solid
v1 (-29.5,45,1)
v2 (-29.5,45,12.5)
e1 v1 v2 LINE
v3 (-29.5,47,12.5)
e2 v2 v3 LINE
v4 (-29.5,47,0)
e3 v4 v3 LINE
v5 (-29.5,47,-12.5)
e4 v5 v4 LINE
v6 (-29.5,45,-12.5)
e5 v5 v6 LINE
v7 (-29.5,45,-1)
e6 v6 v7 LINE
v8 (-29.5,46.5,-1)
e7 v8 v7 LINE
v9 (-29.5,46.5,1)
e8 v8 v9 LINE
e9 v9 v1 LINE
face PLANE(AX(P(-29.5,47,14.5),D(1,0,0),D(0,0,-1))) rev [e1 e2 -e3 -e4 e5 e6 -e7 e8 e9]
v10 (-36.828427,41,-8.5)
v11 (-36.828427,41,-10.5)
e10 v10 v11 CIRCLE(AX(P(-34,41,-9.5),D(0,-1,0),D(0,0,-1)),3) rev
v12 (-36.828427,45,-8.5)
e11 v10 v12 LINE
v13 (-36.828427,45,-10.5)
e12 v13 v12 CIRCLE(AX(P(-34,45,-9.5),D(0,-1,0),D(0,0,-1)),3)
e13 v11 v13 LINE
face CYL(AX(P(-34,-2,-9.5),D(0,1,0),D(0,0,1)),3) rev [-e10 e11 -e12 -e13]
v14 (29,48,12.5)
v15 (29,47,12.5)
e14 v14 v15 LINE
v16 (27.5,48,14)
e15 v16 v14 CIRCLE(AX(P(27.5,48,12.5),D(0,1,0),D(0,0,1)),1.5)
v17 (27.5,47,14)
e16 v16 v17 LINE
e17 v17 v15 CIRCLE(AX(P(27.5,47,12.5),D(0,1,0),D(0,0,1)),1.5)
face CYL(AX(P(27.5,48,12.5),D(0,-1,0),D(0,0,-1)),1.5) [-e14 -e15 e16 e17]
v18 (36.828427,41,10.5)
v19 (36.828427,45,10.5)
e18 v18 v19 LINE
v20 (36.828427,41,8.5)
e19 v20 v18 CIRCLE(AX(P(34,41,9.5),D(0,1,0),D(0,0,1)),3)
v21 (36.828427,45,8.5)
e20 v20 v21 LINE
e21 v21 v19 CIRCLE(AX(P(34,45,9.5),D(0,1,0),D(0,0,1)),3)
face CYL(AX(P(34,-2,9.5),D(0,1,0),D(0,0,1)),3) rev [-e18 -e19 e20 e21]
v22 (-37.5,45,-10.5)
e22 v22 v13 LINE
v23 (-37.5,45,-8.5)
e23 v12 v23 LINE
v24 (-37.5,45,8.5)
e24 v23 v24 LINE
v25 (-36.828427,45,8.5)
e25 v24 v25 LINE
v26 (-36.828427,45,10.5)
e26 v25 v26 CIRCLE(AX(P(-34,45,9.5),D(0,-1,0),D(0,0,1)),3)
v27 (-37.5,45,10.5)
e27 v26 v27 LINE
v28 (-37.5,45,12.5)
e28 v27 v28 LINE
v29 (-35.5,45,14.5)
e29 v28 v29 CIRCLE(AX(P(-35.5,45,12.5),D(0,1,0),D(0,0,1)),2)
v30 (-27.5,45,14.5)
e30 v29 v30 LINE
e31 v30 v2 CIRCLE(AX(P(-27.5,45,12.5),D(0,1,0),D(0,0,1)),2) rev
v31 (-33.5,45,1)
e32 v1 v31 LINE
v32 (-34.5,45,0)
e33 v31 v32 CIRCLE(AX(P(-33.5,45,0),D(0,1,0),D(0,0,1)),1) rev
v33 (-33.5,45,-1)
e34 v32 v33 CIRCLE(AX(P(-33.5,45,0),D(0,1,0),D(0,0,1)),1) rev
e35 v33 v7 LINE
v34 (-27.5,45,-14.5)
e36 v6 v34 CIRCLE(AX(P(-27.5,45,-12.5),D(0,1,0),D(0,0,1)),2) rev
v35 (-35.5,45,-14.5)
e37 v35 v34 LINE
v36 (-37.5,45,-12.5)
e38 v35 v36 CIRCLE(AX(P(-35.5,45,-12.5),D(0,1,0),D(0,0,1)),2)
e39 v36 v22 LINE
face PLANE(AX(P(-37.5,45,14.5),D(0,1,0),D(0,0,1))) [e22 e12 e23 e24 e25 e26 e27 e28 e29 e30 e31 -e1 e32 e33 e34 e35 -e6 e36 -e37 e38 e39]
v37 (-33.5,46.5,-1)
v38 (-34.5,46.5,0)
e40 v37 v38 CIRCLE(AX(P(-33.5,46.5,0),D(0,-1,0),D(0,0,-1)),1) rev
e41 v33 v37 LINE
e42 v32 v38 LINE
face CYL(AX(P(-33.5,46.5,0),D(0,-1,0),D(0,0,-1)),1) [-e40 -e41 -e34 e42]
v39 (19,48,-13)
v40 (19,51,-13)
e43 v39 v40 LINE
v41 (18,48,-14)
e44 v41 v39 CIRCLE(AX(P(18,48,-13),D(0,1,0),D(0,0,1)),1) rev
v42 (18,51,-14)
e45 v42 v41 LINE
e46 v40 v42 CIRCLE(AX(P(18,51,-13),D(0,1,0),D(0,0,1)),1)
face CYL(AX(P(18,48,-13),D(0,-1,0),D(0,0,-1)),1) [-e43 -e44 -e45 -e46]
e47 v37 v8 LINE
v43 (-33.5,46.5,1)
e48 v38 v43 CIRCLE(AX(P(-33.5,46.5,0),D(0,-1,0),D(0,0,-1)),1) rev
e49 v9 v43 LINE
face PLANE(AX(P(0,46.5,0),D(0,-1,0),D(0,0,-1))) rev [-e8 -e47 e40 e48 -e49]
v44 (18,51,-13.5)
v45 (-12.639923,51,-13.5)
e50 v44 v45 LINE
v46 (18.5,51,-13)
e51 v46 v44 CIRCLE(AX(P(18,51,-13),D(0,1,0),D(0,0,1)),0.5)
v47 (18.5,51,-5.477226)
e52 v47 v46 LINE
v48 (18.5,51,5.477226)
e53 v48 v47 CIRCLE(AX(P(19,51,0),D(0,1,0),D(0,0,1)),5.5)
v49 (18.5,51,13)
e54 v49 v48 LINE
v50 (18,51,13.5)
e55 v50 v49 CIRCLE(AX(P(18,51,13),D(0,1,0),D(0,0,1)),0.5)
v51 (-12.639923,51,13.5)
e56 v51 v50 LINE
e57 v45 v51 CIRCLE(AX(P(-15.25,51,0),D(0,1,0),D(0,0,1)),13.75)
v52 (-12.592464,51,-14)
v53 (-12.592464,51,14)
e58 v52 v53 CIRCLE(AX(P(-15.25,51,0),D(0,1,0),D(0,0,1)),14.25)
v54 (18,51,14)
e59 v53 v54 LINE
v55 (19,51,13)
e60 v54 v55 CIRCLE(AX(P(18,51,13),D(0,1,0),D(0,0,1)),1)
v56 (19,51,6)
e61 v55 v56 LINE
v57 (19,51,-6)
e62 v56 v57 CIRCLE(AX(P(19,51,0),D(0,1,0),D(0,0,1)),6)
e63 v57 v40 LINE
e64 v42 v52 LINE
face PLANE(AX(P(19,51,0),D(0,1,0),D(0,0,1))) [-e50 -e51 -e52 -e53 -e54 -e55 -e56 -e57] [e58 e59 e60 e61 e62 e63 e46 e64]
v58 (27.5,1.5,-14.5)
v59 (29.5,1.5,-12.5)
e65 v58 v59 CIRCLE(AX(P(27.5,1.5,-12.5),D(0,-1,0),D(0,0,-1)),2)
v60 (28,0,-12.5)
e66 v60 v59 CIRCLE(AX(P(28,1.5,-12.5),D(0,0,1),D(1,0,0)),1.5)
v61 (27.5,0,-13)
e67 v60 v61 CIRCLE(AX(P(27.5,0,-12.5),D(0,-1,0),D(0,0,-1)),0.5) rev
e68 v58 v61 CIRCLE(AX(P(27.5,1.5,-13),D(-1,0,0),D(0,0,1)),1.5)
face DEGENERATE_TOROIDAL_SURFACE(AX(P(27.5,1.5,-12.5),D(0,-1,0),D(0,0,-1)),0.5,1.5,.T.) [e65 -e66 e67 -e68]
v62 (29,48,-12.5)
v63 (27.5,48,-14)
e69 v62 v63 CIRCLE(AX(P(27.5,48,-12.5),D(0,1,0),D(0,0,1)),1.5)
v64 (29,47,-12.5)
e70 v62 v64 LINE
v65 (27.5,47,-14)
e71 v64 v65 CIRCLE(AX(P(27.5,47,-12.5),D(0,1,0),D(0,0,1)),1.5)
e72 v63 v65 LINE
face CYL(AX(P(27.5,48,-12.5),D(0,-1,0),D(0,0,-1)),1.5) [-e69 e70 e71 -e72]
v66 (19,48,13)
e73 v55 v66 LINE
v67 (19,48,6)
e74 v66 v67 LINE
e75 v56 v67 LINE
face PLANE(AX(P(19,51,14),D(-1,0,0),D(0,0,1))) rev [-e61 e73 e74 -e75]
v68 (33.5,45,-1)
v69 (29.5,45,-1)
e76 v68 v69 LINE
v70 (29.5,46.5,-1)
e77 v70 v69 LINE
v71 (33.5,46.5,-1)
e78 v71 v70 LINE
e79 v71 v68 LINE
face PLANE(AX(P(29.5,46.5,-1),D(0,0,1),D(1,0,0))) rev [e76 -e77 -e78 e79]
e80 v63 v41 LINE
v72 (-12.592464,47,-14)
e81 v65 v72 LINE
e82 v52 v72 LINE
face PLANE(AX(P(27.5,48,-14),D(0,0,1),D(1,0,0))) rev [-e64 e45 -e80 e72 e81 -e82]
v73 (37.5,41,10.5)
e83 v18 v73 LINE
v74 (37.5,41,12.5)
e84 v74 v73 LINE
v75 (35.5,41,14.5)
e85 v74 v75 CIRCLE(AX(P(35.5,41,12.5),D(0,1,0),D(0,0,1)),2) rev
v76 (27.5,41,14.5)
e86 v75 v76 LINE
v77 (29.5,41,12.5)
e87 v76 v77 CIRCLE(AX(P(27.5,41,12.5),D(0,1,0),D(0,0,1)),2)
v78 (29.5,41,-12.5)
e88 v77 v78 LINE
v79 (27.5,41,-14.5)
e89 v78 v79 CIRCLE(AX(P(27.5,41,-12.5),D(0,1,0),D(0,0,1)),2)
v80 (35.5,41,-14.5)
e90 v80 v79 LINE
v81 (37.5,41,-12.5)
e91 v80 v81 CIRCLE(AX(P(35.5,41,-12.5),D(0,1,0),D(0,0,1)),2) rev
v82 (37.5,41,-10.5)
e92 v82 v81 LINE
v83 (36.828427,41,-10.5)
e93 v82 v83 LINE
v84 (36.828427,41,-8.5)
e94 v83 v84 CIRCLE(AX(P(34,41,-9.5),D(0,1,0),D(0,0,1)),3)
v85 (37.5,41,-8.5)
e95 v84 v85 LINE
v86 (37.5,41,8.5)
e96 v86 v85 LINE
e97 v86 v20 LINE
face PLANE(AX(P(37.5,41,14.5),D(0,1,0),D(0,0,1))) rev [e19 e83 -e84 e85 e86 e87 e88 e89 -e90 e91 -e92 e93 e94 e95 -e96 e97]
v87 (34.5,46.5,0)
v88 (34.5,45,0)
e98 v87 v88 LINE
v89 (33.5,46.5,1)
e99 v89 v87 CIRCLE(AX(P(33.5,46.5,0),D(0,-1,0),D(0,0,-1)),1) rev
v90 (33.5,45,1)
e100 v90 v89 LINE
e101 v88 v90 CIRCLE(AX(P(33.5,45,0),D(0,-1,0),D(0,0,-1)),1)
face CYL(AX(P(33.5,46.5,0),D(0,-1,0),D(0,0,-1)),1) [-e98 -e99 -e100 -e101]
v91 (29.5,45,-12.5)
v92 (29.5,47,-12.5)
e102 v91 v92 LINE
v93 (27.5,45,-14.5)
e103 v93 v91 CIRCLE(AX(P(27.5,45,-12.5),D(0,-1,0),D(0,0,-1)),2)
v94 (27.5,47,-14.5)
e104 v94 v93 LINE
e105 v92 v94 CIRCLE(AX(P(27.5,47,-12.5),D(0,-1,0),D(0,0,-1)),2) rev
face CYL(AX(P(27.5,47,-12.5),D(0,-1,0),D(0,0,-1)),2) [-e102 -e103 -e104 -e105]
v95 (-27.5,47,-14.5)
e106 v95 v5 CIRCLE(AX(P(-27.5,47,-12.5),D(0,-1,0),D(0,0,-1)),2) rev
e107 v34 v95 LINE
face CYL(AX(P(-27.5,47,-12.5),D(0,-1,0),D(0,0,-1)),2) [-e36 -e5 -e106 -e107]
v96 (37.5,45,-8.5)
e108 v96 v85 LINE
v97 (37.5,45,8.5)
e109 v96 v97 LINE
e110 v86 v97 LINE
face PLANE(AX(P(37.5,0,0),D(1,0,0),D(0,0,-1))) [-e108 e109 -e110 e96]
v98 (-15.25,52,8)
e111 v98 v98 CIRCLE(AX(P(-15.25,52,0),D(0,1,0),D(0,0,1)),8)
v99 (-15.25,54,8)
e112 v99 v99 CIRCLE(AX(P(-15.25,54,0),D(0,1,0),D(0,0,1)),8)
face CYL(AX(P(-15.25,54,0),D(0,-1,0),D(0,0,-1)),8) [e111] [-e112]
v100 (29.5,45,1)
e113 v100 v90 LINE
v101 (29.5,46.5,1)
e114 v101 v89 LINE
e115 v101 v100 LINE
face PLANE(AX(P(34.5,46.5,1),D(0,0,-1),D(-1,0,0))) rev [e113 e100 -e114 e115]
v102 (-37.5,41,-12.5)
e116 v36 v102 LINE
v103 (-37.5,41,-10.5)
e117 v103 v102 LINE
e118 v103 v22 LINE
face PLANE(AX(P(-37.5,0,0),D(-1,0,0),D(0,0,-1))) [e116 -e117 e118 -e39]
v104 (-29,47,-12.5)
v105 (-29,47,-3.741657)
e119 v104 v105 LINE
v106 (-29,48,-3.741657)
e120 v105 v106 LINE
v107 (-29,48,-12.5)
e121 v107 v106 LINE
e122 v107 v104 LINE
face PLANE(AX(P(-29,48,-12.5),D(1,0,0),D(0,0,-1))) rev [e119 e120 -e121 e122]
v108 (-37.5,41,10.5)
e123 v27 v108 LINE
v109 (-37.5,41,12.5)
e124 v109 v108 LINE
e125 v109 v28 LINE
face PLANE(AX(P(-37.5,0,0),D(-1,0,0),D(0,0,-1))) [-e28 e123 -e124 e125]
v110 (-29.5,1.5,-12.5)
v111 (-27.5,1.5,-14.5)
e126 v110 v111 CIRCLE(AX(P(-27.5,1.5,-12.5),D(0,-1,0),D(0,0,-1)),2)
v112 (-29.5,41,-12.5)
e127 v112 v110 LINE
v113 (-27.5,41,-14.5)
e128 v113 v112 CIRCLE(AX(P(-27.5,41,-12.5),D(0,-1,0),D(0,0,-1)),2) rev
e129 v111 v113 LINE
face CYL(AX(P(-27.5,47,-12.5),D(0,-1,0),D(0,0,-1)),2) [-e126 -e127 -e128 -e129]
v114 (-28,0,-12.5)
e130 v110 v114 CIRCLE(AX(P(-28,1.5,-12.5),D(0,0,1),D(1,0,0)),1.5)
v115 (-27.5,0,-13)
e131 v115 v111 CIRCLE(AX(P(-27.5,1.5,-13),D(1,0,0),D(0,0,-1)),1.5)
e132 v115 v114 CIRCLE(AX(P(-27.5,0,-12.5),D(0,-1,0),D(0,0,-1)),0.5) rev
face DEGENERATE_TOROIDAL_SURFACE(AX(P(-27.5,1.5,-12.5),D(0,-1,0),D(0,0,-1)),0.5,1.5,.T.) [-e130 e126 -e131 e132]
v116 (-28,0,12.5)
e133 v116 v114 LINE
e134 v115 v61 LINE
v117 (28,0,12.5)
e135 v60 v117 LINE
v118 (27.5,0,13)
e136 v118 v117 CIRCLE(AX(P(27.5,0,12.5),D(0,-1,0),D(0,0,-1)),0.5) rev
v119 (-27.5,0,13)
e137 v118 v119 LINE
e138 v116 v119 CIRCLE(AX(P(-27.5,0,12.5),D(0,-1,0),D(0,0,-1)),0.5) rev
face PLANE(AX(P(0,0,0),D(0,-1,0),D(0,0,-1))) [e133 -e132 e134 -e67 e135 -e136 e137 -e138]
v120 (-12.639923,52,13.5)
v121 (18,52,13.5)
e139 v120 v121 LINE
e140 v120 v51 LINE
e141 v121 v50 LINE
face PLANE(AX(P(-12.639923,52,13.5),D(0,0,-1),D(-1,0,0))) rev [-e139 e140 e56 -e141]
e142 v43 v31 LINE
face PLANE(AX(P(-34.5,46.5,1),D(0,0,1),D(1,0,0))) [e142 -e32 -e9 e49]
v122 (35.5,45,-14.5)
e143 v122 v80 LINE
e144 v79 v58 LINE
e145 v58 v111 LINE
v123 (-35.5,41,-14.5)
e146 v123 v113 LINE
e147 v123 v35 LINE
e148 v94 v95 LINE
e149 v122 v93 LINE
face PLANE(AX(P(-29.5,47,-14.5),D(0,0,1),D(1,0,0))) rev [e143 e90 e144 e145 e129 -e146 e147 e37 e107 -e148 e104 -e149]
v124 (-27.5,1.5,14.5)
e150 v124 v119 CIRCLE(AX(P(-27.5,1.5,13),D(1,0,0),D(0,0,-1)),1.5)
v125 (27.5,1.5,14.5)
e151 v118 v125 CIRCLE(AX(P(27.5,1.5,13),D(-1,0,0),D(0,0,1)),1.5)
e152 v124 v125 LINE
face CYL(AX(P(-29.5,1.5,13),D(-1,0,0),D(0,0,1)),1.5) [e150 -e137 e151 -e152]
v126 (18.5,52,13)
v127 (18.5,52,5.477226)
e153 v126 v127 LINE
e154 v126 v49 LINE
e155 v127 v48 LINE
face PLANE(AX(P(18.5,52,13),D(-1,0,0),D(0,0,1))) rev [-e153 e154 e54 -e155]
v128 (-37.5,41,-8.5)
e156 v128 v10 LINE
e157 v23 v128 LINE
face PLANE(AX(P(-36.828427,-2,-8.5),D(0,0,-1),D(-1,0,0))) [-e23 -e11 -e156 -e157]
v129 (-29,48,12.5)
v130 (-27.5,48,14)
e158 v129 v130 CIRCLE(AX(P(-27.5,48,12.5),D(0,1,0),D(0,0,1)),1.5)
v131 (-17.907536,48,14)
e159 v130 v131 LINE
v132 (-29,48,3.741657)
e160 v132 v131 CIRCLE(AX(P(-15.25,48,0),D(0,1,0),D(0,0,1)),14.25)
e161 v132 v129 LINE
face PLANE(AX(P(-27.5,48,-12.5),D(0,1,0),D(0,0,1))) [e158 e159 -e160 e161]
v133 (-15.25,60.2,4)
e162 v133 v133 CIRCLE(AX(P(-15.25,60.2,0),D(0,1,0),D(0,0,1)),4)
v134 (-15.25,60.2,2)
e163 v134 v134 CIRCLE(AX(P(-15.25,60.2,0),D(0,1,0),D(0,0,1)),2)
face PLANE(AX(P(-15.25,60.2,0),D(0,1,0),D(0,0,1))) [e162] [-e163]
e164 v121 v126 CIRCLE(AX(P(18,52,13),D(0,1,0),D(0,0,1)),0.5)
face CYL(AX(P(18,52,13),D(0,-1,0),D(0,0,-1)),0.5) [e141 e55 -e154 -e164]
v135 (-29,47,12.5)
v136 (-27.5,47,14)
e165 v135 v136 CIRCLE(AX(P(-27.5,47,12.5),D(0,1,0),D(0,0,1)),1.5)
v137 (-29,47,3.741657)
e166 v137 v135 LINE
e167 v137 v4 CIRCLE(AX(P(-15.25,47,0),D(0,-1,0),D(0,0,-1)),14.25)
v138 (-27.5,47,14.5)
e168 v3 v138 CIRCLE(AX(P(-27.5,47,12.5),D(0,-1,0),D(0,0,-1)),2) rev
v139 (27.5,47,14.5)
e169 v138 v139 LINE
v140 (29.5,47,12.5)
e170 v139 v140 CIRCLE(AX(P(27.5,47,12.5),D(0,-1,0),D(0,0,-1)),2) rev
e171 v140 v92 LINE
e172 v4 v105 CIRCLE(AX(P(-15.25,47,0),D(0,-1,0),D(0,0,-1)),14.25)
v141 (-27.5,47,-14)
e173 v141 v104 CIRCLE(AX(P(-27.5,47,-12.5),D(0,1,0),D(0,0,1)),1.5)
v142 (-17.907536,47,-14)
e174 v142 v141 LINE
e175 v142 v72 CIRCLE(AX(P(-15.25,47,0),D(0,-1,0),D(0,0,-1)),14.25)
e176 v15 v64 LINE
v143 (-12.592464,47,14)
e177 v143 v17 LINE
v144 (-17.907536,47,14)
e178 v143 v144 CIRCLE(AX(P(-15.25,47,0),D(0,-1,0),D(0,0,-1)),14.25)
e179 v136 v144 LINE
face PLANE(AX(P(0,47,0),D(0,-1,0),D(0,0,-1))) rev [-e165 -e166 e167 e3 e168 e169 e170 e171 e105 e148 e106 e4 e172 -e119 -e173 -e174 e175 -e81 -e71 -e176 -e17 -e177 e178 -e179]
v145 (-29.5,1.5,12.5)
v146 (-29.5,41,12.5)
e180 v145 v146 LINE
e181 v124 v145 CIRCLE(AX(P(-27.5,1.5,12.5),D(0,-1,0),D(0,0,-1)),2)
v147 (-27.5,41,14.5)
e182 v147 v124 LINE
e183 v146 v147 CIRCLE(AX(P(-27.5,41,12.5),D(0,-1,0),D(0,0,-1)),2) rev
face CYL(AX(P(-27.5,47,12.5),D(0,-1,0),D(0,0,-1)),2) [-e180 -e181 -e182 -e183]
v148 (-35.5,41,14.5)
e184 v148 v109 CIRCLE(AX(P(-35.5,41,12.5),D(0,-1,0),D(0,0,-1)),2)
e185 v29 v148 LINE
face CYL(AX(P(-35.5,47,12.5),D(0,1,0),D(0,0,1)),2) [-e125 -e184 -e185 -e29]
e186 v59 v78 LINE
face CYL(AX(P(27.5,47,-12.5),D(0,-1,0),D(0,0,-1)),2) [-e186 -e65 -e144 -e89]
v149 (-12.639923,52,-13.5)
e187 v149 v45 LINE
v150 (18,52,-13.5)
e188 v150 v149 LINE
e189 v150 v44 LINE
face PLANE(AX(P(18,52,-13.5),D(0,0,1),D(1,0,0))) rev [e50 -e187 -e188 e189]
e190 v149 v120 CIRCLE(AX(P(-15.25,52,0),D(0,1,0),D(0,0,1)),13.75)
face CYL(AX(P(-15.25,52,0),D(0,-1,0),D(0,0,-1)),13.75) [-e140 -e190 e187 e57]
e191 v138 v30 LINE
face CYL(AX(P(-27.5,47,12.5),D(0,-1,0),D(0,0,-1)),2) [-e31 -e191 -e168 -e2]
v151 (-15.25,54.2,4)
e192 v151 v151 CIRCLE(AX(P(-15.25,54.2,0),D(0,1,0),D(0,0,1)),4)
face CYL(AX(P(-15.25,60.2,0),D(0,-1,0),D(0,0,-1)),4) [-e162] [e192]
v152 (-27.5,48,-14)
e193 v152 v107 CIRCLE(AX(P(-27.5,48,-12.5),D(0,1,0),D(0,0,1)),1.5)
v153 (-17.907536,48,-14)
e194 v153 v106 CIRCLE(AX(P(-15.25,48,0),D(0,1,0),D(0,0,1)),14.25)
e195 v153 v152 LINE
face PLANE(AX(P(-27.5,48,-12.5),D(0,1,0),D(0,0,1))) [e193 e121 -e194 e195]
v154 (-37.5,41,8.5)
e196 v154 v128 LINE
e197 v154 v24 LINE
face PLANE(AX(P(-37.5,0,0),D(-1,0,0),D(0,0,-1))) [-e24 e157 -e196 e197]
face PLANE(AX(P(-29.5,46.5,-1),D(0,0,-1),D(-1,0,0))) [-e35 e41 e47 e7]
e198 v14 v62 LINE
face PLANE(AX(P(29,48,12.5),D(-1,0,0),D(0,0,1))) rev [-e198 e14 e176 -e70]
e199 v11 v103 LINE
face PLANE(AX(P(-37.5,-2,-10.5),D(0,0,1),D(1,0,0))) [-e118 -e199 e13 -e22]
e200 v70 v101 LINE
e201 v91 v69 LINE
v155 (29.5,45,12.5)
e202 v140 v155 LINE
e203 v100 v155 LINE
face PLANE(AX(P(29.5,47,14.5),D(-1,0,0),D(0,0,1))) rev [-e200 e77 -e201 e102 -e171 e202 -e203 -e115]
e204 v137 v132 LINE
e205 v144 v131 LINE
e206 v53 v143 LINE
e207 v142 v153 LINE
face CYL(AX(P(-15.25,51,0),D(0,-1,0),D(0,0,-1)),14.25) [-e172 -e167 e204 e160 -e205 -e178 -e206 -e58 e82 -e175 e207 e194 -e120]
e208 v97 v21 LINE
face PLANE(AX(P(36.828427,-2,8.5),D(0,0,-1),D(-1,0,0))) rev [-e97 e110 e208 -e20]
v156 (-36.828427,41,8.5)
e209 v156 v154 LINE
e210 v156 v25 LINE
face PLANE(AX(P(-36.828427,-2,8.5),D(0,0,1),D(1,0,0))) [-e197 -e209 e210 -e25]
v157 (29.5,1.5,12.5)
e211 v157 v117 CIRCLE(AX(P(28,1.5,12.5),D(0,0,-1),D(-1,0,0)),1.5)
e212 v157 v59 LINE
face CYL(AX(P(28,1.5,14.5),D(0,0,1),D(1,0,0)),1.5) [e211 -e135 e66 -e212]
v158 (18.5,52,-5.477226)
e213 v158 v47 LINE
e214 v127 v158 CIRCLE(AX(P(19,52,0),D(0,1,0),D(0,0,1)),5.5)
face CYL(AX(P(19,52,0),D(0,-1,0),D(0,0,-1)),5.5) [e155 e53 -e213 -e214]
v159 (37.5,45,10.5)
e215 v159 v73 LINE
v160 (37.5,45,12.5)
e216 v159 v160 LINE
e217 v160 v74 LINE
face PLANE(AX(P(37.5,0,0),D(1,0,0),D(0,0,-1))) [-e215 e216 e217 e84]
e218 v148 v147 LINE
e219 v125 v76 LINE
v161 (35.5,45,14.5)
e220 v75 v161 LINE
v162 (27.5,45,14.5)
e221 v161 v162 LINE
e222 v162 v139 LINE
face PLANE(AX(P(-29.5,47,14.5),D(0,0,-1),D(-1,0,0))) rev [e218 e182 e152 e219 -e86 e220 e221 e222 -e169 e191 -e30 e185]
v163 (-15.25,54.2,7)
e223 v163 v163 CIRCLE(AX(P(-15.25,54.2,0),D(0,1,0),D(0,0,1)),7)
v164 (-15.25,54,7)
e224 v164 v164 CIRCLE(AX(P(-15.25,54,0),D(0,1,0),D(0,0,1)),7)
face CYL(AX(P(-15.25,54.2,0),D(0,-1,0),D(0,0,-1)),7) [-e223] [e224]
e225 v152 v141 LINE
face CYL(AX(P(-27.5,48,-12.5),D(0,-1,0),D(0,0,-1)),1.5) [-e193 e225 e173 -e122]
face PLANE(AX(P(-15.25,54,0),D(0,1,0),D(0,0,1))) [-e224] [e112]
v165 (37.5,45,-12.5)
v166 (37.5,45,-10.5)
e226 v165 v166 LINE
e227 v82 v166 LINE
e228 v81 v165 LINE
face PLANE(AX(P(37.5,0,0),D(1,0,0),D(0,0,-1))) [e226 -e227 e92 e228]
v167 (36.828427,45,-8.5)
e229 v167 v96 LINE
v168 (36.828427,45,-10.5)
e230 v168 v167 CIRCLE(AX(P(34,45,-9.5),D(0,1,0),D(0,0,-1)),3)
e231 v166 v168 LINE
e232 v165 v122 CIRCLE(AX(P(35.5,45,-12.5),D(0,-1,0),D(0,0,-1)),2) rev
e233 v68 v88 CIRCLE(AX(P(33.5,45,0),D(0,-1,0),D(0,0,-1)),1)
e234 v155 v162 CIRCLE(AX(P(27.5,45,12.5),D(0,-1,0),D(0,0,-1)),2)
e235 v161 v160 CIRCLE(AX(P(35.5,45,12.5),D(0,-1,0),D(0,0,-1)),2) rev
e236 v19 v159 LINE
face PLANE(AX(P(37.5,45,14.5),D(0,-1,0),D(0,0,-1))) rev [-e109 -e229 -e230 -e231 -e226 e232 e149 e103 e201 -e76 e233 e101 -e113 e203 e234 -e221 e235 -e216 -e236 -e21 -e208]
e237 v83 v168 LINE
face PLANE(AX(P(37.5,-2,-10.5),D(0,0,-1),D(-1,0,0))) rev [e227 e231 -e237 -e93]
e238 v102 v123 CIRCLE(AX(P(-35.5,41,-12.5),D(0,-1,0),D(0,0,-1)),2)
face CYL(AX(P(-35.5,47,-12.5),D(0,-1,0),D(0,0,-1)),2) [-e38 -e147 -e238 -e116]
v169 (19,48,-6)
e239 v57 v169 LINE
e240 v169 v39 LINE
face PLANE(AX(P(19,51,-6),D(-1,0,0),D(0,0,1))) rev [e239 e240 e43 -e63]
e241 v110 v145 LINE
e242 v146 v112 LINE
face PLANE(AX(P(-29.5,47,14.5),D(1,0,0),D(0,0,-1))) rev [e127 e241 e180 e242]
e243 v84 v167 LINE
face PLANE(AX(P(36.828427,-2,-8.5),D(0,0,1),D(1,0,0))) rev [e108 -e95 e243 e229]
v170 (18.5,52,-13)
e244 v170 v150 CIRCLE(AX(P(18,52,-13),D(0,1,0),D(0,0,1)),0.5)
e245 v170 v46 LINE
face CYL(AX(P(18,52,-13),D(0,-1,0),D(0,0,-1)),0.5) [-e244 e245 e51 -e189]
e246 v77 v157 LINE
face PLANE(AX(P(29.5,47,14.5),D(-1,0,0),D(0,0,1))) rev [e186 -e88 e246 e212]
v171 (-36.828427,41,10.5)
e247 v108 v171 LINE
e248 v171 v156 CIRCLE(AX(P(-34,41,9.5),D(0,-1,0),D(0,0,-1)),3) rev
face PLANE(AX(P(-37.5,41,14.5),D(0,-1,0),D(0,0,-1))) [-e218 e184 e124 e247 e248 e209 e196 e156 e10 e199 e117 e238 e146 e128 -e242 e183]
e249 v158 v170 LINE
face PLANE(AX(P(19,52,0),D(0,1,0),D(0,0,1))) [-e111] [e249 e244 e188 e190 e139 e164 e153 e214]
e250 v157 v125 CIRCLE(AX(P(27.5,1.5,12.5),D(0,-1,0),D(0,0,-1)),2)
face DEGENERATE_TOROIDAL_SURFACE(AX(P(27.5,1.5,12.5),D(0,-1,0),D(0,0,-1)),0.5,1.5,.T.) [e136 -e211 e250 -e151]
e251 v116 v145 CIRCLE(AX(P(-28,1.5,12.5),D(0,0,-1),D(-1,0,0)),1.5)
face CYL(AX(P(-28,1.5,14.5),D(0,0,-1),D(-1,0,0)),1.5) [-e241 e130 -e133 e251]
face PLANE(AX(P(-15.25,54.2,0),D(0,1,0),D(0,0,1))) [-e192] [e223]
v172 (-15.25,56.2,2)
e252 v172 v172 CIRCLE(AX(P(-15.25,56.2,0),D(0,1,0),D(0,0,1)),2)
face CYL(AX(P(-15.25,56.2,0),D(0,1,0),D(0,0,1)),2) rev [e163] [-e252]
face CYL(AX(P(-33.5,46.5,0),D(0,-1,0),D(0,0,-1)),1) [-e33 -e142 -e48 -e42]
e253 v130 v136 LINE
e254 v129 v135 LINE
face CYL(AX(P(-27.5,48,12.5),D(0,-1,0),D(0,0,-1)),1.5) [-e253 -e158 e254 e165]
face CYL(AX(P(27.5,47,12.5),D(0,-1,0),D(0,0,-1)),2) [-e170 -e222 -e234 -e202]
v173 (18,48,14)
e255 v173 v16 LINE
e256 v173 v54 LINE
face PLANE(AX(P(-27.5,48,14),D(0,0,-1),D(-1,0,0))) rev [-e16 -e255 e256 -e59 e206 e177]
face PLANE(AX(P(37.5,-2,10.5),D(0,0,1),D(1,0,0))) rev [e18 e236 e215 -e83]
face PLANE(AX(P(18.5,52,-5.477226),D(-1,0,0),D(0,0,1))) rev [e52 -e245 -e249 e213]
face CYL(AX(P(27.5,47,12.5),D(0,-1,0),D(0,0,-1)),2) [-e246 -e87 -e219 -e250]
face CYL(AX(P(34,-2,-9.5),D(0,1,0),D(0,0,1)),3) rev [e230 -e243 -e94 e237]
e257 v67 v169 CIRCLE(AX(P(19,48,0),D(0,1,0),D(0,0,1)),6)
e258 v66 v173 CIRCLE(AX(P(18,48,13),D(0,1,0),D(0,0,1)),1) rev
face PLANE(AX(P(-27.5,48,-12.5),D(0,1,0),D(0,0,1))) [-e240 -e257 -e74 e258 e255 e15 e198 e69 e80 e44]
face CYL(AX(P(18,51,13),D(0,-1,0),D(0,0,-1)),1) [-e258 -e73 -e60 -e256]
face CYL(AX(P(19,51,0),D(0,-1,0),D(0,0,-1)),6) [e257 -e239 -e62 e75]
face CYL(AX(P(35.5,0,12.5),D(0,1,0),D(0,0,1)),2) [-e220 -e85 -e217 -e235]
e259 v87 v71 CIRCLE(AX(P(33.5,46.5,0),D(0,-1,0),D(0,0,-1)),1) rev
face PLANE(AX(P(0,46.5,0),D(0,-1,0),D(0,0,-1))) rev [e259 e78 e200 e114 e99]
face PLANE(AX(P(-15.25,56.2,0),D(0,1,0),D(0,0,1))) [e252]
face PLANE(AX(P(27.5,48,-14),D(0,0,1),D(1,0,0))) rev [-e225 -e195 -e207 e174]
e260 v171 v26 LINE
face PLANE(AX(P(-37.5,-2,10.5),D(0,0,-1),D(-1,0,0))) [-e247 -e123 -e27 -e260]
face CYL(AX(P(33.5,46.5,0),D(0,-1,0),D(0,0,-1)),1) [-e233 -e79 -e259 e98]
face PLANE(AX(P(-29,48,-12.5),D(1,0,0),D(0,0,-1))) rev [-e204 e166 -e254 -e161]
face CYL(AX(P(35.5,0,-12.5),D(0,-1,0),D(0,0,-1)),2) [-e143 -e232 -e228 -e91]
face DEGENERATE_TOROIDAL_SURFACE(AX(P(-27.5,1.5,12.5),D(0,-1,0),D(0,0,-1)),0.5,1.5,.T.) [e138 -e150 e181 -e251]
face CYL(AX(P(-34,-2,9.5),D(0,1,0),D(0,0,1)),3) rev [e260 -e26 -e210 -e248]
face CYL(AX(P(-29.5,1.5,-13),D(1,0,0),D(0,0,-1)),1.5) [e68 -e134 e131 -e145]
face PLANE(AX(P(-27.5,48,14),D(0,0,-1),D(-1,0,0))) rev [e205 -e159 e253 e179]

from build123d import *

# Parameters (mm, degrees)
SKETCH2_W            = 59
SKETCH2_H            = 29
BOSS_EXTRUDE1_DEPTH  = 47
FILLET1_R            = 1.5
SKETCH3_W            = 29
SKETCH3_H            = 4
BOSS_EXTRUDE2_DEPTH  = 8
CUT_EXTRUDE1_DEPTH   = 47
FILLET2_R            = 2
SKETCH6_W            = 5
SKETCH6_H            = 2
BOSS_EXTRUDE3_DEPTH  = 1.5
FILLET3_R            = 1
FILLET3_OF_MIRROR2_R = 1
FILLET4_R            = 2
BOSS_EXTRUDE4_DEPTH  = 1
BOSS_EXTRUDE6_DEPTH  = 3
BOSS_EXTRUDE8_REACH  = 64.614
BOSS_EXTRUDE9_REACH  = 64.614
BOSS_EXTRUDE10_REACH = 64.614
FILLET5_R            = 1
BOSS_EXTRUDE11_DEPTH = 1
SKETCH15_R           = 8
BOSS_EXTRUDE12_DEPTH = 2
SKETCH16_R           = 7
BOSS_EXTRUDE13_DEPTH = 0.2
SKETCH17_R           = 4
BOSS_EXTRUDE14_DEPTH = 6
SKETCH18_R           = 2
CUT_EXTRUDE2_DEPTH   = 4


# Some blends are built 0.0001 mm under size
with BuildPart() as part:
    # Sketch2 → Boss-Extrude1 (new body)
    with BuildSketch(Plane(origin=(0, 0, 0), x_dir=(1, 0, 0), z_dir=(0, 1, 0))):
        Rectangle(SKETCH2_W, SKETCH2_H)
    extrude(amount=BOSS_EXTRUDE1_DEPTH)

    # Fillet1
    fillet1_edges = [part.edges().sort_by_distance(p)[0] for p in [
        (0, 0, 14.5),
        (-29.5, 0, 0),
        (0, 0, -14.5),
        (29.5, 0, 0),
    ]]
    fillet(fillet1_edges, radius=FILLET1_R)

    # Sketch3 → Boss-Extrude2 (add)
    with BuildSketch(Plane(origin=(29.5, 0, 0), x_dir=(0, 0, -1), z_dir=(1, 0, 0))):
        with Locations((0, 43)):
            Rectangle(SKETCH3_W, SKETCH3_H)
    boss_extrude2 = extrude(amount=BOSS_EXTRUDE2_DEPTH)

    # Sketch4 → Cut-Extrude1 (cut)
    with BuildSketch(Plane(origin=(0, 45, 0), x_dir=(1, 0, 0), z_dir=(0, 1, 0))):
        with BuildLine():
            Line((36.828427125, -8.5), (37.5, -8.5))
            Line((37.5, -8.5), (37.5, -10.5))
            Line((37.5, -10.5), (36.828427125, -10.5))
            ThreePointArc((36.828427125, -10.5), (31, -9.5), (36.828427125, -8.5))
        make_face()
        with BuildLine():
            Line((37.5, 8.5), (37.5, 10.5))
            Line((37.5, 10.5), (36.828427125, 10.5))
            ThreePointArc((36.828427125, 10.5), (31, 9.5), (36.828427125, 8.5))
            Line((36.828427125, 8.5), (37.5, 8.5))
        make_face()
    cut_extrude1 = extrude(amount=-CUT_EXTRUDE1_DEPTH, mode=Mode.SUBTRACT)

    # Mirror1: Boss-Extrude2, Cut-Extrude1 across plane
    add(boss_extrude2.mirror(Plane(origin=(0, 0, 0), x_dir=(0, 0, 1), z_dir=(1, 0, 0))))
    add(cut_extrude1.mirror(Plane(origin=(0, 0, 0), x_dir=(0, 0, 1), z_dir=(1, 0, 0))), mode=Mode.SUBTRACT)

    # Fillet2
    fillet2_edges = [part.edges().sort_by_distance(p)[0] for p in [
        (37.5, 43, 14.5),
        (37.5, 43, -14.5),
        (-37.5, 43, 14.5),
        (-37.5, 43, -14.5),
    ]]
    fillet(fillet2_edges, radius=FILLET2_R)

    # Sketch6 → Boss-Extrude3 (add)
    with BuildSketch(Plane(origin=(0, 45, 0), x_dir=(1, 0, 0), z_dir=(0, 1, 0))):
        with Locations((32, 0)):
            Rectangle(SKETCH6_W, SKETCH6_H)
    boss_extrude3 = extrude(amount=BOSS_EXTRUDE3_DEPTH)

    # Fillet3
    fillet3_edges = [part.edges().sort_by_distance(p)[0] for p in [
        (34.5, 45.75, -1),
        (34.5, 45.75, 1),
    ]]
    fillet(fillet3_edges, radius=FILLET3_R - 0.0001)  # a hair under: the kernel refuses the full size

    # Mirror2: Boss-Extrude3 across plane
    add(boss_extrude3.mirror(Plane(origin=(0, 0, 0), x_dir=(0, 0, 1), z_dir=(1, 0, 0))))

    # Fillet3 of Mirror2
    fillet3_of_mirror2_edges = [part.edges().sort_by_distance(p)[0] for p in [
        (-34.5, 45.75, -1),
        (-34.5, 45.75, 1),
    ]]
    fillet(fillet3_of_mirror2_edges, radius=FILLET3_OF_MIRROR2_R - 0.0001)  # a hair under: the kernel refuses the full size

    # Fillet4
    # the kernel refuses this fillet: 2 mm, written as the material it takes off along each edge
    with BuildSketch(Plane(origin=(27.5, 0, 12.5), x_dir=(1, 0, 0), z_dir=(0, 0, -1))) as fillet4_piece_1:
        with BuildLine():
            CenterArc((0.5, -1.5), 1.5, 0, 90)
            Line((2, -1.5), (2, 0))
            Line((2, 0), (0.5, 0))
        make_face()
    revolve(axis=Axis((27.5, 0, 12.5), (0, -1, 0)), revolution_arc=90, mode=Mode.SUBTRACT)
    with BuildSketch(Plane(origin=(-27.5, 0, 12.5), x_dir=(0, 0, 1), z_dir=(1, 0, 0))) as fillet4_piece_2:
        with BuildLine():
            CenterArc((0.5, -1.5), 1.5, 0, 90)
            Line((2, -1.5), (2, 0))
            Line((2, 0), (0.5, 0))
        make_face()
    revolve(axis=Axis((-27.5, 0, 12.5), (0, -1, 0)), revolution_arc=90, mode=Mode.SUBTRACT)
    with BuildSketch(Plane(origin=(27.5, 0, -12.5), x_dir=(0, 0, -1), z_dir=(-1, 0, 0))) as fillet4_piece_3:
        with BuildLine():
            CenterArc((0.5, -1.5), 1.5, 0, 90)
            Line((2, -1.5), (2, 0))
            Line((2, 0), (0.5, 0))
        make_face()
    revolve(axis=Axis((27.5, 0, -12.5), (0, -1, 0)), revolution_arc=90, mode=Mode.SUBTRACT)
    with BuildSketch(Plane(origin=(-27.5, 0, -12.5), x_dir=(-1, 0, 0), z_dir=(0, 0, 1))) as fillet4_piece_4:
        with BuildLine():
            CenterArc((0.5, -1.5), 1.5, 0, 90)
            Line((2, -1.5), (2, 0))
            Line((2, 0), (0.5, 0))
        make_face()
    revolve(axis=Axis((-27.5, 0, -12.5), (0, -1, 0)), revolution_arc=90, mode=Mode.SUBTRACT)
    with BuildSketch(Plane(origin=(29.5, 0, 14.5), x_dir=(-1, 0, 0), z_dir=(0, 1, 0)), Plane(origin=(-29.5, 0, -14.5), x_dir=(1, 0, 0), z_dir=(0, 1, 0))) as fillet4_piece_5:
        with BuildLine():
            CenterArc((FILLET4_R, -FILLET4_R), FILLET4_R, 90, 90)
            Line((0, -FILLET4_R), (0, 0))
            Line((0, 0), (FILLET4_R, 0))
        make_face()
    extrude(amount=41, mode=Mode.SUBTRACT)
    with BuildSketch(Plane(origin=(29.5, 0, 14.5), x_dir=(-1, 0, 0), z_dir=(0, 1, 0))) as fillet4_piece_6_section:
        with BuildLine():
            CenterArc((FILLET4_R, -FILLET4_R), FILLET4_R, 90, 90)
            Line((0, -FILLET4_R), (0, 0))
            Line((0, 0), (FILLET4_R, 0))
        make_face()
    fillet4_piece_6 = extrude(amount=46, mode=Mode.PRIVATE)
    fillet4_piece_6 = split(fillet4_piece_6, bisect_by=Plane(origin=(29.047209771, 45, 14.047209771), z_dir=(0, 1, 0)), keep=Keep.TOP, mode=Mode.PRIVATE)
    add(fillet4_piece_6, mode=Mode.SUBTRACT)
    with BuildSketch(Plane(origin=(29.5, 0, -14.5), x_dir=(-1, 0, 0), z_dir=(0, 1, 0)), Plane(origin=(-29.5, 0, 14.5), x_dir=(1, 0, 0), z_dir=(0, 1, 0))) as fillet4_piece_7:
        with BuildLine():
            CenterArc((FILLET4_R, FILLET4_R), FILLET4_R, 180, 90)
            Line((0, FILLET4_R), (0, 0))
            Line((0, 0), (FILLET4_R, 0))
        make_face()
    extrude(amount=41, mode=Mode.SUBTRACT)
    with BuildSketch(Plane(origin=(29.5, 0, -14.5), x_dir=(-1, 0, 0), z_dir=(0, 1, 0))) as fillet4_piece_8_section:
        with BuildLine():
            CenterArc((FILLET4_R, FILLET4_R), FILLET4_R, 180, 90)
            Line((0, FILLET4_R), (0, 0))
            Line((0, 0), (FILLET4_R, 0))
        make_face()
    fillet4_piece_8 = extrude(amount=46, mode=Mode.PRIVATE)
    fillet4_piece_8 = split(fillet4_piece_8, bisect_by=Plane(origin=(29.047209771, 45, -14.047209771), z_dir=(0, 1, 0)), keep=Keep.TOP, mode=Mode.PRIVATE)
    add(fillet4_piece_8, mode=Mode.SUBTRACT)
    with BuildSketch(Plane(origin=(29.5, 40, 14.5), x_dir=(-1, 0, 0), z_dir=(0, 1, 0))) as fillet4_piece_9_section:
        with BuildLine():
            CenterArc((FILLET4_R, -FILLET4_R), FILLET4_R, 90, 90)
            Line((0, -FILLET4_R), (0, 0))
            Line((0, 0), (FILLET4_R, 0))
        make_face()
    fillet4_piece_9 = extrude(amount=12, mode=Mode.PRIVATE)
    fillet4_piece_9 = split(fillet4_piece_9, bisect_by=Plane(origin=(29.047209771, 41, 14.047209771), z_dir=(0, -1, 0)), keep=Keep.TOP, mode=Mode.PRIVATE)
    add(fillet4_piece_9, mode=Mode.SUBTRACT)
    with BuildSketch(Plane(origin=(29.5, 45, 14.5), x_dir=(-1, 0, 0), z_dir=(0, 1, 0)), Plane(origin=(-29.5, 45, 14.5), x_dir=(0, 0, -1), z_dir=(0, 1, 0))) as fillet4_piece_10:
        with BuildLine():
            CenterArc((FILLET4_R, -FILLET4_R), FILLET4_R, 90, 90)
            Line((0, -FILLET4_R), (0, 0))
            Line((0, 0), (FILLET4_R, 0))
        make_face()
    extrude(amount=7, mode=Mode.SUBTRACT)
    with BuildSketch(Plane(origin=(-29.5, 40, 14.5), x_dir=(0, 0, -1), z_dir=(0, 1, 0))) as fillet4_piece_11_section:
        with BuildLine():
            CenterArc((FILLET4_R, -FILLET4_R), FILLET4_R, 90, 90)
            Line((0, -FILLET4_R), (0, 0))
            Line((0, 0), (FILLET4_R, 0))
        make_face()
    fillet4_piece_11 = extrude(amount=12, mode=Mode.PRIVATE)
    fillet4_piece_11 = split(fillet4_piece_11, bisect_by=Plane(origin=(-29.047209771, 41, 14.047209771), z_dir=(0, -1, 0)), keep=Keep.TOP, mode=Mode.PRIVATE)
    add(fillet4_piece_11, mode=Mode.SUBTRACT)
    with BuildSketch(Plane(origin=(-29.5, 40, -14.5), x_dir=(0, 0, 1), z_dir=(0, 1, 0))) as fillet4_piece_12_section:
        with BuildLine():
            CenterArc((FILLET4_R, FILLET4_R), FILLET4_R, 180, 90)
            Line((0, FILLET4_R), (0, 0))
            Line((0, 0), (FILLET4_R, 0))
        make_face()
    fillet4_piece_12 = extrude(amount=12, mode=Mode.PRIVATE)
    fillet4_piece_12 = split(fillet4_piece_12, bisect_by=Plane(origin=(-29.047209771, 41, -14.047209771), z_dir=(0, -1, 0)), keep=Keep.TOP, mode=Mode.PRIVATE)
    add(fillet4_piece_12, mode=Mode.SUBTRACT)
    with BuildSketch(Plane(origin=(-29.5, 45, -14.5), x_dir=(0, 0, 1), z_dir=(0, 1, 0)), Plane(origin=(29.5, 45, -14.5), x_dir=(-1, 0, 0), z_dir=(0, 1, 0))) as fillet4_piece_13:
        with BuildLine():
            CenterArc((FILLET4_R, FILLET4_R), FILLET4_R, 180, 90)
            Line((0, FILLET4_R), (0, 0))
            Line((0, 0), (FILLET4_R, 0))
        make_face()
    extrude(amount=7, mode=Mode.SUBTRACT)
    with BuildSketch(Plane(origin=(29.5, 40, -14.5), x_dir=(-1, 0, 0), z_dir=(0, 1, 0))) as fillet4_piece_14_section:
        with BuildLine():
            CenterArc((FILLET4_R, FILLET4_R), FILLET4_R, 180, 90)
            Line((0, FILLET4_R), (0, 0))
            Line((0, 0), (FILLET4_R, 0))
        make_face()
    fillet4_piece_14 = extrude(amount=12, mode=Mode.PRIVATE)
    fillet4_piece_14 = split(fillet4_piece_14, bisect_by=Plane(origin=(29.047209771, 41, -14.047209771), z_dir=(0, -1, 0)), keep=Keep.TOP, mode=Mode.PRIVATE)
    add(fillet4_piece_14, mode=Mode.SUBTRACT)
    with BuildSketch(Plane(origin=(-29.5, 0, 14.5), x_dir=(1, 0, 0), z_dir=(0, 1, 0))) as fillet4_piece_15_section:
        with BuildLine():
            CenterArc((FILLET4_R, FILLET4_R), FILLET4_R, 180, 90)
            Line((0, FILLET4_R), (0, 0))
            Line((0, 0), (FILLET4_R, 0))
        make_face()
    fillet4_piece_15 = extrude(amount=46, mode=Mode.PRIVATE)
    fillet4_piece_15 = split(fillet4_piece_15, bisect_by=Plane(origin=(-29.047209771, 45, 14.047209771), z_dir=(0, 1, 0)), keep=Keep.TOP, mode=Mode.PRIVATE)
    add(fillet4_piece_15, mode=Mode.SUBTRACT)
    with BuildSketch(Plane(origin=(-29.5, 0, -14.5), x_dir=(1, 0, 0), z_dir=(0, 1, 0))) as fillet4_piece_16_section:
        with BuildLine():
            CenterArc((FILLET4_R, -FILLET4_R), FILLET4_R, 90, 90)
            Line((0, -FILLET4_R), (0, 0))
            Line((0, 0), (FILLET4_R, 0))
        make_face()
    fillet4_piece_16 = extrude(amount=46, mode=Mode.PRIVATE)
    fillet4_piece_16 = split(fillet4_piece_16, bisect_by=Plane(origin=(-29.047209771, 45, -14.047209771), z_dir=(0, 1, 0)), keep=Keep.TOP, mode=Mode.PRIVATE)
    add(fillet4_piece_16, mode=Mode.SUBTRACT)

    # Sketch7 → Boss-Extrude4 (add)
    with BuildSketch(Plane(origin=(0, 47, 0), x_dir=(1, 0, 0), z_dir=(0, 1, 0))):
        with BuildLine():
            Line((-29, 12.5), (-29, -12.5))
            ThreePointArc((-29, -12.5), (-28.560660172, -13.560660172), (-27.5, -14))
            Line((-27.5, -14), (27.5, -14))
            ThreePointArc((27.5, -14), (28.560660172, -13.560660172), (29, -12.5))
            Line((29, -12.5), (29, 12.5))
            ThreePointArc((29, 12.5), (28.560660172, 13.560660172), (27.5, 14))
            Line((27.5, 14), (-27.5, 14))
            ThreePointArc((-27.5, 14), (-28.560660172, 13.560660172), (-29, 12.5))
        make_face()
    extrude(amount=BOSS_EXTRUDE4_DEPTH)

    # Sketch8 → Boss-Extrude6 (add)
    with BuildSketch(Plane(origin=(0, 48, 0), x_dir=(1, 0, 0), z_dir=(0, 1, 0))):
        with BuildLine():
            Line((19, -14), (-12.592463547, -14))
            ThreePointArc((-12.592463547, -14), (-29.5, 0), (-12.592463547, 14))
            Line((-12.592463547, 14), (19, 14))
            Line((19, 14), (19, 6))
            ThreePointArc((19, 6), (25, 0), (19, -6))
            Line((19, -6), (19, -14))
        make_face()
    extrude(amount=BOSS_EXTRUDE6_DEPTH)

    # Sketch10 → Boss-Extrude8 (add, up to next)
    with BuildSketch(Plane.XZ.offset(-48), mode=Mode.PRIVATE) as boss_extrude8_sk1:
        with BuildLine():
            Line((-17.907536453, 14), (-12.592463547, 14))
            ThreePointArc((-12.592463547, 14), (-15.25, 14.25), (-17.907536453, 14))
        make_face()
    boss_extrude8_tool1 = extrude(boss_extrude8_sk1.sketch, amount=BOSS_EXTRUDE8_REACH, mode=Mode.PRIVATE) - part.part
    add(boss_extrude8_tool1.solids().sort_by_distance((-15.25, 48, 14.100076))[0])

    # Sketch11 → Boss-Extrude9 (add, up to next)
    with BuildSketch(Plane.XZ.offset(-48), mode=Mode.PRIVATE) as boss_extrude9_sk1:
        with BuildLine():
            Line((-29, -3.741657387), (-29, 3.741657387))
            ThreePointArc((-29, 3.741657387), (-29.5, 0), (-29, -3.741657387))
        make_face()
    boss_extrude9_tool1 = extrude(boss_extrude9_sk1.sketch, amount=BOSS_EXTRUDE9_REACH, mode=Mode.PRIVATE) - part.part
    add(boss_extrude9_tool1.solids().sort_by_distance((-29.200304, 48, 0))[0])

    # Sketch12 → Boss-Extrude10 (add, up to next)
    with BuildSketch(Plane.XZ.offset(-48), mode=Mode.PRIVATE) as boss_extrude10_sk1:
        with BuildLine():
            Line((-12.592463547, -14), (-17.907536453, -14))
            ThreePointArc((-17.907536453, -14), (-15.25, -14.25), (-12.592463547, -14))
        make_face()
    boss_extrude10_tool1 = extrude(boss_extrude10_sk1.sketch, amount=BOSS_EXTRUDE10_REACH, mode=Mode.PRIVATE) - part.part
    add(boss_extrude10_tool1.solids().sort_by_distance((-15.25, 48, -14.100076))[0])

    # Fillet5
    fillet5_edges = [part.edges().sort_by_distance(p)[0] for p in [
        (19, 49.5, 14),
        (19, 49.5, -14),
    ]]
    fillet(fillet5_edges, radius=FILLET5_R)

    # Sketch13 → Boss-Extrude11 (add)
    with BuildSketch(Plane(origin=(0, 51, 0), x_dir=(1, 0, 0), z_dir=(0, 1, 0))):
        with BuildLine():
            Line((18.5, 5.477225575), (18.5, 13))
            ThreePointArc((18.5, 13), (18.353553391, 13.353553391), (18, 13.5))
            Line((18, 13.5), (-12.639923373, 13.5))
            ThreePointArc((-12.639923373, 13.5), (-29, 0), (-12.639923373, -13.5))
            Line((-12.639923373, -13.5), (18, -13.5))
            ThreePointArc((18, -13.5), (18.353553391, -13.353553391), (18.5, -13))
            Line((18.5, -13), (18.5, -5.477225575))
            ThreePointArc((18.5, -5.477225575), (24.5, 0), (18.5, 5.477225575))
        make_face()
    extrude(amount=BOSS_EXTRUDE11_DEPTH)

    # Sketch15 → Boss-Extrude12 (add)
    with BuildSketch(Plane(origin=(0, 52, 0), x_dir=(1, 0, 0), z_dir=(0, 1, 0))):
        with Locations(Location((-15.25, 0, 0), (0, 0, 270))):
            Circle(SKETCH15_R)
    extrude(amount=BOSS_EXTRUDE12_DEPTH)

    # Sketch16 → Boss-Extrude13 (add)
    with BuildSketch(Plane(origin=(0, 54, 0), x_dir=(1, 0, 0), z_dir=(0, 1, 0))):
        with Locations(Location((-15.25, 0, 0), (0, 0, 270))):
            Circle(SKETCH16_R)
    extrude(amount=BOSS_EXTRUDE13_DEPTH)

    # Sketch17 → Boss-Extrude14 (add)
    with BuildSketch(Plane(origin=(0, 54.2, 0), x_dir=(1, 0, 0), z_dir=(0, 1, 0))):
        with Locations(Location((-15.25, 0, 0), (0, 0, 270))):
            Circle(SKETCH17_R)
    extrude(amount=BOSS_EXTRUDE14_DEPTH)

    # Sketch18 → Cut-Extrude2 (cut)
    with BuildSketch(Plane(origin=(0, 60.2, 0), x_dir=(1, 0, 0), z_dir=(0, 1, 0))):
        with Locations(Location((-15.25, 0, 0), (0, 0, 270))):
            Circle(SKETCH18_R)
    extrude(amount=-CUT_EXTRUDE2_DEPTH, mode=Mode.SUBTRACT)


solid = part.part
